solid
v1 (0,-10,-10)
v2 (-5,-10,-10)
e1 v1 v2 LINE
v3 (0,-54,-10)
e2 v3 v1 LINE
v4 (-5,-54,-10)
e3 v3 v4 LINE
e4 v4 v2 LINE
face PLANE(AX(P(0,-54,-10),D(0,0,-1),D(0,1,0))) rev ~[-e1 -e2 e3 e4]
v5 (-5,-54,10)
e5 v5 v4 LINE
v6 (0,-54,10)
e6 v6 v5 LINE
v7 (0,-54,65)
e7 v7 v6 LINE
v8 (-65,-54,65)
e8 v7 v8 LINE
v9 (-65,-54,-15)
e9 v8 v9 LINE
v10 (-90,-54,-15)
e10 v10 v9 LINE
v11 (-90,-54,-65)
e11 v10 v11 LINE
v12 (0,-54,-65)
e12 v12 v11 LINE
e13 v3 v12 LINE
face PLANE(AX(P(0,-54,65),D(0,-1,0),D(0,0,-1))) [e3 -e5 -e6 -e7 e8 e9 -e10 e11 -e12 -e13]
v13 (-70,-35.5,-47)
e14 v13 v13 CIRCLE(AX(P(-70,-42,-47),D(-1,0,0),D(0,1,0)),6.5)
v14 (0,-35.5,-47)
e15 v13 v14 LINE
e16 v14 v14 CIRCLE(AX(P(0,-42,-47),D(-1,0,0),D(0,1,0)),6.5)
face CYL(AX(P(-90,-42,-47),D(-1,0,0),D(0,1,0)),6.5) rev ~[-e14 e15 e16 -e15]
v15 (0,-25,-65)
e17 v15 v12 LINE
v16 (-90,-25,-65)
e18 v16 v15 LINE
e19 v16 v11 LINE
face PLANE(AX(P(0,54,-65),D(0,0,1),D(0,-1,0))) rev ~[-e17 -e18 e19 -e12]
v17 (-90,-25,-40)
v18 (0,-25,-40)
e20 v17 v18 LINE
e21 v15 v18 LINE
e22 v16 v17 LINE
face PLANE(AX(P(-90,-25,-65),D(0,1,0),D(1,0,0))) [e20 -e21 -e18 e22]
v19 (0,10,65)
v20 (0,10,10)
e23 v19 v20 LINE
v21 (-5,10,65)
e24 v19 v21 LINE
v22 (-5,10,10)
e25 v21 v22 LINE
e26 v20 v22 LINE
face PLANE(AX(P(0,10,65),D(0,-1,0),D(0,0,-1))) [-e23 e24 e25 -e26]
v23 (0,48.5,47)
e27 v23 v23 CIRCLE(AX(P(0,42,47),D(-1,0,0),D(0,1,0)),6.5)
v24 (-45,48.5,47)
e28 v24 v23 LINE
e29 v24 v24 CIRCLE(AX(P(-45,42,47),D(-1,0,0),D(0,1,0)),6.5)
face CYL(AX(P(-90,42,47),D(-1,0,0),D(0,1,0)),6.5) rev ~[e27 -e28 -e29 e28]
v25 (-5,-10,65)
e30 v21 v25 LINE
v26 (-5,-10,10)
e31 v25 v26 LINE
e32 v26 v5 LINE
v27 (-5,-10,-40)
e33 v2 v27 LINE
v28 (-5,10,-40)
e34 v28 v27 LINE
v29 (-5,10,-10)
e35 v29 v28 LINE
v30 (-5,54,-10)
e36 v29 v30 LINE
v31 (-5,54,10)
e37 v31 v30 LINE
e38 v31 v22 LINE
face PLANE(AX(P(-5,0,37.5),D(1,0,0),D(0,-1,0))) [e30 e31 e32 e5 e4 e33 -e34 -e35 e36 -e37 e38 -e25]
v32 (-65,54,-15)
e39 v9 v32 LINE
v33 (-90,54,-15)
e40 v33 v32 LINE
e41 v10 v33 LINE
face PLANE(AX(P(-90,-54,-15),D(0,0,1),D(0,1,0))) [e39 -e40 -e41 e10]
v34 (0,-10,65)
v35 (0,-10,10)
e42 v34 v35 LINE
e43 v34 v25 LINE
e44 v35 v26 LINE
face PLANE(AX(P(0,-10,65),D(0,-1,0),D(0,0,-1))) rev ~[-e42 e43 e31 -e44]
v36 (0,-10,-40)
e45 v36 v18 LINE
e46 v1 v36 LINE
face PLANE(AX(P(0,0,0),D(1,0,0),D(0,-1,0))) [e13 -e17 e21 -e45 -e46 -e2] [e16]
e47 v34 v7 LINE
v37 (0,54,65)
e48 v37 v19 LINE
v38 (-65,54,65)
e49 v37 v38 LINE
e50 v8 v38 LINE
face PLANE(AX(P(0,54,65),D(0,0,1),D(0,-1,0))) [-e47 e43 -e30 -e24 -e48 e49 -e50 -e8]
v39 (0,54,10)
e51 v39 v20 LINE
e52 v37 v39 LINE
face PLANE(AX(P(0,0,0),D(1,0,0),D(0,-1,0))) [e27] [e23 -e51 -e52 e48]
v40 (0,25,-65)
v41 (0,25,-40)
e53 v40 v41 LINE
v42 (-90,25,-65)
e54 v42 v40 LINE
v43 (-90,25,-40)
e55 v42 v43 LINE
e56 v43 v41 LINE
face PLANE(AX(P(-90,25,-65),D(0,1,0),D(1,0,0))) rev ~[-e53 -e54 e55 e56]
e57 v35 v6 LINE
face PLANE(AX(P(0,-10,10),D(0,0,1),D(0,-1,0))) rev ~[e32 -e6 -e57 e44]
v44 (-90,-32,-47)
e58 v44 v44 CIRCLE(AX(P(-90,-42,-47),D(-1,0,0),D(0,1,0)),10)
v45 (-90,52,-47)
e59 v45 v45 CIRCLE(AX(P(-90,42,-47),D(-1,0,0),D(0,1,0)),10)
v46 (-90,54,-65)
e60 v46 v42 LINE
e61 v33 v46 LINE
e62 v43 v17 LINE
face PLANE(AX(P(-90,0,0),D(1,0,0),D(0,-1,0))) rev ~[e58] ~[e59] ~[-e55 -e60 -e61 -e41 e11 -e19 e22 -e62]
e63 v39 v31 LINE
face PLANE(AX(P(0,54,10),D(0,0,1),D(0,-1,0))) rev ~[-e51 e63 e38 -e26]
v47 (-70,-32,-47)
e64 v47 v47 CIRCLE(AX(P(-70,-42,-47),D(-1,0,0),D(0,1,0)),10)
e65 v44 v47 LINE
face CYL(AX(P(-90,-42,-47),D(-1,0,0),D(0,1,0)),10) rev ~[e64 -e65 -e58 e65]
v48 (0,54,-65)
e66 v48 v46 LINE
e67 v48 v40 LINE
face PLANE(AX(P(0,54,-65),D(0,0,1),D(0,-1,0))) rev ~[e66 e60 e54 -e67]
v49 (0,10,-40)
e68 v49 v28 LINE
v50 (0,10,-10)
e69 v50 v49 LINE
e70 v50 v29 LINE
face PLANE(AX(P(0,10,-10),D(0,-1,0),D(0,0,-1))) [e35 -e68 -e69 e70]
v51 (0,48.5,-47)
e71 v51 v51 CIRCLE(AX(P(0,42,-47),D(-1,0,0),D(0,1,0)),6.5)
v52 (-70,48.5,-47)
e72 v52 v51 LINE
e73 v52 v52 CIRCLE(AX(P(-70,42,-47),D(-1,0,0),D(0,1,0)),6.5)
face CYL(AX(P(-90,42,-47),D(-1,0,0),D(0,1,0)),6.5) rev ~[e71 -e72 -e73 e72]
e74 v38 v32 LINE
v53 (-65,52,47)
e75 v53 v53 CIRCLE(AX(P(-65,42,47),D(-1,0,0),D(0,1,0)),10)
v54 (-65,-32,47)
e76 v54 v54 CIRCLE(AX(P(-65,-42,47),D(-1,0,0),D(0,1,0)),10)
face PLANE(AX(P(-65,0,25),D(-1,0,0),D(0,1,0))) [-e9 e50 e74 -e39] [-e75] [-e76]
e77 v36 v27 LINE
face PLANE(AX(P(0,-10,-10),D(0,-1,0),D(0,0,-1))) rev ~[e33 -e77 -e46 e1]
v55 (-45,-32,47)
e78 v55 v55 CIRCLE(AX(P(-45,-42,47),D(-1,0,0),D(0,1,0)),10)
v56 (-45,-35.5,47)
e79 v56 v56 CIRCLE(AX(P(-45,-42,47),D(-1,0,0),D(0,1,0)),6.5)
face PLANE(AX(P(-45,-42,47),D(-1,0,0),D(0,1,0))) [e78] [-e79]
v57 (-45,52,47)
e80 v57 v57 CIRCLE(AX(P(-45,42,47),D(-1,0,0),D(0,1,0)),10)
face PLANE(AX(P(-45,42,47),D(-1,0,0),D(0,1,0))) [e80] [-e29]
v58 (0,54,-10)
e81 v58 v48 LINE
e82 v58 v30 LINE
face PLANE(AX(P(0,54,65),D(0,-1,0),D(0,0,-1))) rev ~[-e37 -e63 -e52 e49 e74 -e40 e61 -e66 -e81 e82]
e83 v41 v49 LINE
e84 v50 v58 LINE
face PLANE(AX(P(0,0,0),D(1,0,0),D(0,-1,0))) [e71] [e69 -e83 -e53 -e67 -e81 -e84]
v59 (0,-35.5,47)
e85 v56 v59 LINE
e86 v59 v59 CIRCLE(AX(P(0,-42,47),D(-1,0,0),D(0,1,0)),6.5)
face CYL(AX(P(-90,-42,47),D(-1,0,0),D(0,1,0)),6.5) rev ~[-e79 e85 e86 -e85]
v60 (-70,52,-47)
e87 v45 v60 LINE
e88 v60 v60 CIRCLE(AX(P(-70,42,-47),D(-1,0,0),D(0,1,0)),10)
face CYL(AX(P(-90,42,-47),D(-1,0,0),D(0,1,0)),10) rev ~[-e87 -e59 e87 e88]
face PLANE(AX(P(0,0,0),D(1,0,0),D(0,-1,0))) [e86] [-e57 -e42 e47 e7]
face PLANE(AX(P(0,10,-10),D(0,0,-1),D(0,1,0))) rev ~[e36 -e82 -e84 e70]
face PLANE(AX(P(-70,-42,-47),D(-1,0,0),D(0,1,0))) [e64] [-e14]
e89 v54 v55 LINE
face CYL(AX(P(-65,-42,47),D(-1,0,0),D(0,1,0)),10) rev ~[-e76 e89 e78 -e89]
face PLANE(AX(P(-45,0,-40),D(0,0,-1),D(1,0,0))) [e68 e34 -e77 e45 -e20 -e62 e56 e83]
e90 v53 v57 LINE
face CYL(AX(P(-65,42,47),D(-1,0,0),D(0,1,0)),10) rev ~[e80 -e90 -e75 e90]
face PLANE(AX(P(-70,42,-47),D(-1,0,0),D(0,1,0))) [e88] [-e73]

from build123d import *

# Parameters (mm, degrees)
F0_W      = 108
F0_H      = 130
F1_DEPTH  = 90
F2_R      = 6.5
F3_DEPTH  = 90.001
F4_W      = 108
F4_H      = 80
F5_DEPTH  = 25
F6_W      = 90
F6_H      = 50
F7_DEPTH  = 25
F8_R      = 10
F9_DEPTH  = 20
F10_R     = 10
F11_DEPTH = 20
F12_W     = 20
F12_H     = 55
F12_W_2   = 44
F12_H_2   = 20
F13_DEPTH = 5
F15_ANGLE = 180


with BuildPart() as f1:
    # F0 (on Right) → F1 (new body)
    with BuildSketch(Plane.YZ):
        Rectangle(F0_W, F0_H)
    extrude(amount=-F1_DEPTH)

    # F2 (on face) → F3 (cut, through all)
    with BuildSketch(Plane(origin=(-90, 0, 0), x_dir=(0, -1, 0), z_dir=(-1, 0, 0))):
        with Locations((-42, 47)):
            Circle(F2_R)
        with Locations((42, 47)):
            Circle(F2_R)
        with Locations((-42, -47)):
            Circle(F2_R)
        with Locations((42, -47)):
            Circle(F2_R)
    extrude(amount=-F3_DEPTH, mode=Mode.SUBTRACT)

    # F4 (on face) → F5 (cut)
    with BuildSketch(Plane(origin=(-90, 0, 0), x_dir=(0, -1, 0), z_dir=(-1, 0, 0))):
        with Locations((0, -25)):
            Rectangle(F4_W, F4_H)
    extrude(amount=-F5_DEPTH, mode=Mode.SUBTRACT)

    # F6 (on face) → F7 (cut)
    with BuildSketch(Plane.XY.offset(65)):
        with Locations((-45, 0)):
            Rectangle(F6_W, F6_H)
    extrude(amount=-F7_DEPTH, mode=Mode.SUBTRACT)

    # F8 (on face) → F9 (cut)
    with BuildSketch(Plane(origin=(-65, 0, 0), x_dir=(0, -1, 0), z_dir=(-1, 0, 0))):
        with Locations((42, -47)):
            Circle(F8_R)
        with Locations((-42, -47)):
            Circle(F8_R)
    extrude(amount=-F9_DEPTH, mode=Mode.SUBTRACT)

    # F10 (on face) → F11 (cut)
    with BuildSketch(Plane(origin=(-90, 0, 0), x_dir=(0, -1, 0), z_dir=(-1, 0, 0))):
        with Locations((42, 47)):
            Circle(F10_R)
        with Locations((-42, 47)):
            Circle(F10_R)
    extrude(amount=-F11_DEPTH, mode=Mode.SUBTRACT)

    # F12 (on face) → F13 (cut)
    with BuildSketch(Plane.YZ):
        with Locations((0, -37.5)):
            Rectangle(F12_W, F12_H)
        with Locations((-32, 0)):
            Rectangle(F12_W_2, F12_H_2)
        Rectangle(F12_W, F12_H_2)
        with Locations((32, 0)):
            Rectangle(F12_W_2, F12_H_2)
        with Locations((0, 37.5)):
            Rectangle(F12_W, F12_H)
    extrude(amount=-F13_DEPTH, mode=Mode.SUBTRACT)


with BuildPart() as f1_1:
    # F15: moved
    add(f1.part.rotate(Axis((42.7994653583, 0, 0), (1, 0, 0)), F15_ANGLE))


solid = f1_1.part
